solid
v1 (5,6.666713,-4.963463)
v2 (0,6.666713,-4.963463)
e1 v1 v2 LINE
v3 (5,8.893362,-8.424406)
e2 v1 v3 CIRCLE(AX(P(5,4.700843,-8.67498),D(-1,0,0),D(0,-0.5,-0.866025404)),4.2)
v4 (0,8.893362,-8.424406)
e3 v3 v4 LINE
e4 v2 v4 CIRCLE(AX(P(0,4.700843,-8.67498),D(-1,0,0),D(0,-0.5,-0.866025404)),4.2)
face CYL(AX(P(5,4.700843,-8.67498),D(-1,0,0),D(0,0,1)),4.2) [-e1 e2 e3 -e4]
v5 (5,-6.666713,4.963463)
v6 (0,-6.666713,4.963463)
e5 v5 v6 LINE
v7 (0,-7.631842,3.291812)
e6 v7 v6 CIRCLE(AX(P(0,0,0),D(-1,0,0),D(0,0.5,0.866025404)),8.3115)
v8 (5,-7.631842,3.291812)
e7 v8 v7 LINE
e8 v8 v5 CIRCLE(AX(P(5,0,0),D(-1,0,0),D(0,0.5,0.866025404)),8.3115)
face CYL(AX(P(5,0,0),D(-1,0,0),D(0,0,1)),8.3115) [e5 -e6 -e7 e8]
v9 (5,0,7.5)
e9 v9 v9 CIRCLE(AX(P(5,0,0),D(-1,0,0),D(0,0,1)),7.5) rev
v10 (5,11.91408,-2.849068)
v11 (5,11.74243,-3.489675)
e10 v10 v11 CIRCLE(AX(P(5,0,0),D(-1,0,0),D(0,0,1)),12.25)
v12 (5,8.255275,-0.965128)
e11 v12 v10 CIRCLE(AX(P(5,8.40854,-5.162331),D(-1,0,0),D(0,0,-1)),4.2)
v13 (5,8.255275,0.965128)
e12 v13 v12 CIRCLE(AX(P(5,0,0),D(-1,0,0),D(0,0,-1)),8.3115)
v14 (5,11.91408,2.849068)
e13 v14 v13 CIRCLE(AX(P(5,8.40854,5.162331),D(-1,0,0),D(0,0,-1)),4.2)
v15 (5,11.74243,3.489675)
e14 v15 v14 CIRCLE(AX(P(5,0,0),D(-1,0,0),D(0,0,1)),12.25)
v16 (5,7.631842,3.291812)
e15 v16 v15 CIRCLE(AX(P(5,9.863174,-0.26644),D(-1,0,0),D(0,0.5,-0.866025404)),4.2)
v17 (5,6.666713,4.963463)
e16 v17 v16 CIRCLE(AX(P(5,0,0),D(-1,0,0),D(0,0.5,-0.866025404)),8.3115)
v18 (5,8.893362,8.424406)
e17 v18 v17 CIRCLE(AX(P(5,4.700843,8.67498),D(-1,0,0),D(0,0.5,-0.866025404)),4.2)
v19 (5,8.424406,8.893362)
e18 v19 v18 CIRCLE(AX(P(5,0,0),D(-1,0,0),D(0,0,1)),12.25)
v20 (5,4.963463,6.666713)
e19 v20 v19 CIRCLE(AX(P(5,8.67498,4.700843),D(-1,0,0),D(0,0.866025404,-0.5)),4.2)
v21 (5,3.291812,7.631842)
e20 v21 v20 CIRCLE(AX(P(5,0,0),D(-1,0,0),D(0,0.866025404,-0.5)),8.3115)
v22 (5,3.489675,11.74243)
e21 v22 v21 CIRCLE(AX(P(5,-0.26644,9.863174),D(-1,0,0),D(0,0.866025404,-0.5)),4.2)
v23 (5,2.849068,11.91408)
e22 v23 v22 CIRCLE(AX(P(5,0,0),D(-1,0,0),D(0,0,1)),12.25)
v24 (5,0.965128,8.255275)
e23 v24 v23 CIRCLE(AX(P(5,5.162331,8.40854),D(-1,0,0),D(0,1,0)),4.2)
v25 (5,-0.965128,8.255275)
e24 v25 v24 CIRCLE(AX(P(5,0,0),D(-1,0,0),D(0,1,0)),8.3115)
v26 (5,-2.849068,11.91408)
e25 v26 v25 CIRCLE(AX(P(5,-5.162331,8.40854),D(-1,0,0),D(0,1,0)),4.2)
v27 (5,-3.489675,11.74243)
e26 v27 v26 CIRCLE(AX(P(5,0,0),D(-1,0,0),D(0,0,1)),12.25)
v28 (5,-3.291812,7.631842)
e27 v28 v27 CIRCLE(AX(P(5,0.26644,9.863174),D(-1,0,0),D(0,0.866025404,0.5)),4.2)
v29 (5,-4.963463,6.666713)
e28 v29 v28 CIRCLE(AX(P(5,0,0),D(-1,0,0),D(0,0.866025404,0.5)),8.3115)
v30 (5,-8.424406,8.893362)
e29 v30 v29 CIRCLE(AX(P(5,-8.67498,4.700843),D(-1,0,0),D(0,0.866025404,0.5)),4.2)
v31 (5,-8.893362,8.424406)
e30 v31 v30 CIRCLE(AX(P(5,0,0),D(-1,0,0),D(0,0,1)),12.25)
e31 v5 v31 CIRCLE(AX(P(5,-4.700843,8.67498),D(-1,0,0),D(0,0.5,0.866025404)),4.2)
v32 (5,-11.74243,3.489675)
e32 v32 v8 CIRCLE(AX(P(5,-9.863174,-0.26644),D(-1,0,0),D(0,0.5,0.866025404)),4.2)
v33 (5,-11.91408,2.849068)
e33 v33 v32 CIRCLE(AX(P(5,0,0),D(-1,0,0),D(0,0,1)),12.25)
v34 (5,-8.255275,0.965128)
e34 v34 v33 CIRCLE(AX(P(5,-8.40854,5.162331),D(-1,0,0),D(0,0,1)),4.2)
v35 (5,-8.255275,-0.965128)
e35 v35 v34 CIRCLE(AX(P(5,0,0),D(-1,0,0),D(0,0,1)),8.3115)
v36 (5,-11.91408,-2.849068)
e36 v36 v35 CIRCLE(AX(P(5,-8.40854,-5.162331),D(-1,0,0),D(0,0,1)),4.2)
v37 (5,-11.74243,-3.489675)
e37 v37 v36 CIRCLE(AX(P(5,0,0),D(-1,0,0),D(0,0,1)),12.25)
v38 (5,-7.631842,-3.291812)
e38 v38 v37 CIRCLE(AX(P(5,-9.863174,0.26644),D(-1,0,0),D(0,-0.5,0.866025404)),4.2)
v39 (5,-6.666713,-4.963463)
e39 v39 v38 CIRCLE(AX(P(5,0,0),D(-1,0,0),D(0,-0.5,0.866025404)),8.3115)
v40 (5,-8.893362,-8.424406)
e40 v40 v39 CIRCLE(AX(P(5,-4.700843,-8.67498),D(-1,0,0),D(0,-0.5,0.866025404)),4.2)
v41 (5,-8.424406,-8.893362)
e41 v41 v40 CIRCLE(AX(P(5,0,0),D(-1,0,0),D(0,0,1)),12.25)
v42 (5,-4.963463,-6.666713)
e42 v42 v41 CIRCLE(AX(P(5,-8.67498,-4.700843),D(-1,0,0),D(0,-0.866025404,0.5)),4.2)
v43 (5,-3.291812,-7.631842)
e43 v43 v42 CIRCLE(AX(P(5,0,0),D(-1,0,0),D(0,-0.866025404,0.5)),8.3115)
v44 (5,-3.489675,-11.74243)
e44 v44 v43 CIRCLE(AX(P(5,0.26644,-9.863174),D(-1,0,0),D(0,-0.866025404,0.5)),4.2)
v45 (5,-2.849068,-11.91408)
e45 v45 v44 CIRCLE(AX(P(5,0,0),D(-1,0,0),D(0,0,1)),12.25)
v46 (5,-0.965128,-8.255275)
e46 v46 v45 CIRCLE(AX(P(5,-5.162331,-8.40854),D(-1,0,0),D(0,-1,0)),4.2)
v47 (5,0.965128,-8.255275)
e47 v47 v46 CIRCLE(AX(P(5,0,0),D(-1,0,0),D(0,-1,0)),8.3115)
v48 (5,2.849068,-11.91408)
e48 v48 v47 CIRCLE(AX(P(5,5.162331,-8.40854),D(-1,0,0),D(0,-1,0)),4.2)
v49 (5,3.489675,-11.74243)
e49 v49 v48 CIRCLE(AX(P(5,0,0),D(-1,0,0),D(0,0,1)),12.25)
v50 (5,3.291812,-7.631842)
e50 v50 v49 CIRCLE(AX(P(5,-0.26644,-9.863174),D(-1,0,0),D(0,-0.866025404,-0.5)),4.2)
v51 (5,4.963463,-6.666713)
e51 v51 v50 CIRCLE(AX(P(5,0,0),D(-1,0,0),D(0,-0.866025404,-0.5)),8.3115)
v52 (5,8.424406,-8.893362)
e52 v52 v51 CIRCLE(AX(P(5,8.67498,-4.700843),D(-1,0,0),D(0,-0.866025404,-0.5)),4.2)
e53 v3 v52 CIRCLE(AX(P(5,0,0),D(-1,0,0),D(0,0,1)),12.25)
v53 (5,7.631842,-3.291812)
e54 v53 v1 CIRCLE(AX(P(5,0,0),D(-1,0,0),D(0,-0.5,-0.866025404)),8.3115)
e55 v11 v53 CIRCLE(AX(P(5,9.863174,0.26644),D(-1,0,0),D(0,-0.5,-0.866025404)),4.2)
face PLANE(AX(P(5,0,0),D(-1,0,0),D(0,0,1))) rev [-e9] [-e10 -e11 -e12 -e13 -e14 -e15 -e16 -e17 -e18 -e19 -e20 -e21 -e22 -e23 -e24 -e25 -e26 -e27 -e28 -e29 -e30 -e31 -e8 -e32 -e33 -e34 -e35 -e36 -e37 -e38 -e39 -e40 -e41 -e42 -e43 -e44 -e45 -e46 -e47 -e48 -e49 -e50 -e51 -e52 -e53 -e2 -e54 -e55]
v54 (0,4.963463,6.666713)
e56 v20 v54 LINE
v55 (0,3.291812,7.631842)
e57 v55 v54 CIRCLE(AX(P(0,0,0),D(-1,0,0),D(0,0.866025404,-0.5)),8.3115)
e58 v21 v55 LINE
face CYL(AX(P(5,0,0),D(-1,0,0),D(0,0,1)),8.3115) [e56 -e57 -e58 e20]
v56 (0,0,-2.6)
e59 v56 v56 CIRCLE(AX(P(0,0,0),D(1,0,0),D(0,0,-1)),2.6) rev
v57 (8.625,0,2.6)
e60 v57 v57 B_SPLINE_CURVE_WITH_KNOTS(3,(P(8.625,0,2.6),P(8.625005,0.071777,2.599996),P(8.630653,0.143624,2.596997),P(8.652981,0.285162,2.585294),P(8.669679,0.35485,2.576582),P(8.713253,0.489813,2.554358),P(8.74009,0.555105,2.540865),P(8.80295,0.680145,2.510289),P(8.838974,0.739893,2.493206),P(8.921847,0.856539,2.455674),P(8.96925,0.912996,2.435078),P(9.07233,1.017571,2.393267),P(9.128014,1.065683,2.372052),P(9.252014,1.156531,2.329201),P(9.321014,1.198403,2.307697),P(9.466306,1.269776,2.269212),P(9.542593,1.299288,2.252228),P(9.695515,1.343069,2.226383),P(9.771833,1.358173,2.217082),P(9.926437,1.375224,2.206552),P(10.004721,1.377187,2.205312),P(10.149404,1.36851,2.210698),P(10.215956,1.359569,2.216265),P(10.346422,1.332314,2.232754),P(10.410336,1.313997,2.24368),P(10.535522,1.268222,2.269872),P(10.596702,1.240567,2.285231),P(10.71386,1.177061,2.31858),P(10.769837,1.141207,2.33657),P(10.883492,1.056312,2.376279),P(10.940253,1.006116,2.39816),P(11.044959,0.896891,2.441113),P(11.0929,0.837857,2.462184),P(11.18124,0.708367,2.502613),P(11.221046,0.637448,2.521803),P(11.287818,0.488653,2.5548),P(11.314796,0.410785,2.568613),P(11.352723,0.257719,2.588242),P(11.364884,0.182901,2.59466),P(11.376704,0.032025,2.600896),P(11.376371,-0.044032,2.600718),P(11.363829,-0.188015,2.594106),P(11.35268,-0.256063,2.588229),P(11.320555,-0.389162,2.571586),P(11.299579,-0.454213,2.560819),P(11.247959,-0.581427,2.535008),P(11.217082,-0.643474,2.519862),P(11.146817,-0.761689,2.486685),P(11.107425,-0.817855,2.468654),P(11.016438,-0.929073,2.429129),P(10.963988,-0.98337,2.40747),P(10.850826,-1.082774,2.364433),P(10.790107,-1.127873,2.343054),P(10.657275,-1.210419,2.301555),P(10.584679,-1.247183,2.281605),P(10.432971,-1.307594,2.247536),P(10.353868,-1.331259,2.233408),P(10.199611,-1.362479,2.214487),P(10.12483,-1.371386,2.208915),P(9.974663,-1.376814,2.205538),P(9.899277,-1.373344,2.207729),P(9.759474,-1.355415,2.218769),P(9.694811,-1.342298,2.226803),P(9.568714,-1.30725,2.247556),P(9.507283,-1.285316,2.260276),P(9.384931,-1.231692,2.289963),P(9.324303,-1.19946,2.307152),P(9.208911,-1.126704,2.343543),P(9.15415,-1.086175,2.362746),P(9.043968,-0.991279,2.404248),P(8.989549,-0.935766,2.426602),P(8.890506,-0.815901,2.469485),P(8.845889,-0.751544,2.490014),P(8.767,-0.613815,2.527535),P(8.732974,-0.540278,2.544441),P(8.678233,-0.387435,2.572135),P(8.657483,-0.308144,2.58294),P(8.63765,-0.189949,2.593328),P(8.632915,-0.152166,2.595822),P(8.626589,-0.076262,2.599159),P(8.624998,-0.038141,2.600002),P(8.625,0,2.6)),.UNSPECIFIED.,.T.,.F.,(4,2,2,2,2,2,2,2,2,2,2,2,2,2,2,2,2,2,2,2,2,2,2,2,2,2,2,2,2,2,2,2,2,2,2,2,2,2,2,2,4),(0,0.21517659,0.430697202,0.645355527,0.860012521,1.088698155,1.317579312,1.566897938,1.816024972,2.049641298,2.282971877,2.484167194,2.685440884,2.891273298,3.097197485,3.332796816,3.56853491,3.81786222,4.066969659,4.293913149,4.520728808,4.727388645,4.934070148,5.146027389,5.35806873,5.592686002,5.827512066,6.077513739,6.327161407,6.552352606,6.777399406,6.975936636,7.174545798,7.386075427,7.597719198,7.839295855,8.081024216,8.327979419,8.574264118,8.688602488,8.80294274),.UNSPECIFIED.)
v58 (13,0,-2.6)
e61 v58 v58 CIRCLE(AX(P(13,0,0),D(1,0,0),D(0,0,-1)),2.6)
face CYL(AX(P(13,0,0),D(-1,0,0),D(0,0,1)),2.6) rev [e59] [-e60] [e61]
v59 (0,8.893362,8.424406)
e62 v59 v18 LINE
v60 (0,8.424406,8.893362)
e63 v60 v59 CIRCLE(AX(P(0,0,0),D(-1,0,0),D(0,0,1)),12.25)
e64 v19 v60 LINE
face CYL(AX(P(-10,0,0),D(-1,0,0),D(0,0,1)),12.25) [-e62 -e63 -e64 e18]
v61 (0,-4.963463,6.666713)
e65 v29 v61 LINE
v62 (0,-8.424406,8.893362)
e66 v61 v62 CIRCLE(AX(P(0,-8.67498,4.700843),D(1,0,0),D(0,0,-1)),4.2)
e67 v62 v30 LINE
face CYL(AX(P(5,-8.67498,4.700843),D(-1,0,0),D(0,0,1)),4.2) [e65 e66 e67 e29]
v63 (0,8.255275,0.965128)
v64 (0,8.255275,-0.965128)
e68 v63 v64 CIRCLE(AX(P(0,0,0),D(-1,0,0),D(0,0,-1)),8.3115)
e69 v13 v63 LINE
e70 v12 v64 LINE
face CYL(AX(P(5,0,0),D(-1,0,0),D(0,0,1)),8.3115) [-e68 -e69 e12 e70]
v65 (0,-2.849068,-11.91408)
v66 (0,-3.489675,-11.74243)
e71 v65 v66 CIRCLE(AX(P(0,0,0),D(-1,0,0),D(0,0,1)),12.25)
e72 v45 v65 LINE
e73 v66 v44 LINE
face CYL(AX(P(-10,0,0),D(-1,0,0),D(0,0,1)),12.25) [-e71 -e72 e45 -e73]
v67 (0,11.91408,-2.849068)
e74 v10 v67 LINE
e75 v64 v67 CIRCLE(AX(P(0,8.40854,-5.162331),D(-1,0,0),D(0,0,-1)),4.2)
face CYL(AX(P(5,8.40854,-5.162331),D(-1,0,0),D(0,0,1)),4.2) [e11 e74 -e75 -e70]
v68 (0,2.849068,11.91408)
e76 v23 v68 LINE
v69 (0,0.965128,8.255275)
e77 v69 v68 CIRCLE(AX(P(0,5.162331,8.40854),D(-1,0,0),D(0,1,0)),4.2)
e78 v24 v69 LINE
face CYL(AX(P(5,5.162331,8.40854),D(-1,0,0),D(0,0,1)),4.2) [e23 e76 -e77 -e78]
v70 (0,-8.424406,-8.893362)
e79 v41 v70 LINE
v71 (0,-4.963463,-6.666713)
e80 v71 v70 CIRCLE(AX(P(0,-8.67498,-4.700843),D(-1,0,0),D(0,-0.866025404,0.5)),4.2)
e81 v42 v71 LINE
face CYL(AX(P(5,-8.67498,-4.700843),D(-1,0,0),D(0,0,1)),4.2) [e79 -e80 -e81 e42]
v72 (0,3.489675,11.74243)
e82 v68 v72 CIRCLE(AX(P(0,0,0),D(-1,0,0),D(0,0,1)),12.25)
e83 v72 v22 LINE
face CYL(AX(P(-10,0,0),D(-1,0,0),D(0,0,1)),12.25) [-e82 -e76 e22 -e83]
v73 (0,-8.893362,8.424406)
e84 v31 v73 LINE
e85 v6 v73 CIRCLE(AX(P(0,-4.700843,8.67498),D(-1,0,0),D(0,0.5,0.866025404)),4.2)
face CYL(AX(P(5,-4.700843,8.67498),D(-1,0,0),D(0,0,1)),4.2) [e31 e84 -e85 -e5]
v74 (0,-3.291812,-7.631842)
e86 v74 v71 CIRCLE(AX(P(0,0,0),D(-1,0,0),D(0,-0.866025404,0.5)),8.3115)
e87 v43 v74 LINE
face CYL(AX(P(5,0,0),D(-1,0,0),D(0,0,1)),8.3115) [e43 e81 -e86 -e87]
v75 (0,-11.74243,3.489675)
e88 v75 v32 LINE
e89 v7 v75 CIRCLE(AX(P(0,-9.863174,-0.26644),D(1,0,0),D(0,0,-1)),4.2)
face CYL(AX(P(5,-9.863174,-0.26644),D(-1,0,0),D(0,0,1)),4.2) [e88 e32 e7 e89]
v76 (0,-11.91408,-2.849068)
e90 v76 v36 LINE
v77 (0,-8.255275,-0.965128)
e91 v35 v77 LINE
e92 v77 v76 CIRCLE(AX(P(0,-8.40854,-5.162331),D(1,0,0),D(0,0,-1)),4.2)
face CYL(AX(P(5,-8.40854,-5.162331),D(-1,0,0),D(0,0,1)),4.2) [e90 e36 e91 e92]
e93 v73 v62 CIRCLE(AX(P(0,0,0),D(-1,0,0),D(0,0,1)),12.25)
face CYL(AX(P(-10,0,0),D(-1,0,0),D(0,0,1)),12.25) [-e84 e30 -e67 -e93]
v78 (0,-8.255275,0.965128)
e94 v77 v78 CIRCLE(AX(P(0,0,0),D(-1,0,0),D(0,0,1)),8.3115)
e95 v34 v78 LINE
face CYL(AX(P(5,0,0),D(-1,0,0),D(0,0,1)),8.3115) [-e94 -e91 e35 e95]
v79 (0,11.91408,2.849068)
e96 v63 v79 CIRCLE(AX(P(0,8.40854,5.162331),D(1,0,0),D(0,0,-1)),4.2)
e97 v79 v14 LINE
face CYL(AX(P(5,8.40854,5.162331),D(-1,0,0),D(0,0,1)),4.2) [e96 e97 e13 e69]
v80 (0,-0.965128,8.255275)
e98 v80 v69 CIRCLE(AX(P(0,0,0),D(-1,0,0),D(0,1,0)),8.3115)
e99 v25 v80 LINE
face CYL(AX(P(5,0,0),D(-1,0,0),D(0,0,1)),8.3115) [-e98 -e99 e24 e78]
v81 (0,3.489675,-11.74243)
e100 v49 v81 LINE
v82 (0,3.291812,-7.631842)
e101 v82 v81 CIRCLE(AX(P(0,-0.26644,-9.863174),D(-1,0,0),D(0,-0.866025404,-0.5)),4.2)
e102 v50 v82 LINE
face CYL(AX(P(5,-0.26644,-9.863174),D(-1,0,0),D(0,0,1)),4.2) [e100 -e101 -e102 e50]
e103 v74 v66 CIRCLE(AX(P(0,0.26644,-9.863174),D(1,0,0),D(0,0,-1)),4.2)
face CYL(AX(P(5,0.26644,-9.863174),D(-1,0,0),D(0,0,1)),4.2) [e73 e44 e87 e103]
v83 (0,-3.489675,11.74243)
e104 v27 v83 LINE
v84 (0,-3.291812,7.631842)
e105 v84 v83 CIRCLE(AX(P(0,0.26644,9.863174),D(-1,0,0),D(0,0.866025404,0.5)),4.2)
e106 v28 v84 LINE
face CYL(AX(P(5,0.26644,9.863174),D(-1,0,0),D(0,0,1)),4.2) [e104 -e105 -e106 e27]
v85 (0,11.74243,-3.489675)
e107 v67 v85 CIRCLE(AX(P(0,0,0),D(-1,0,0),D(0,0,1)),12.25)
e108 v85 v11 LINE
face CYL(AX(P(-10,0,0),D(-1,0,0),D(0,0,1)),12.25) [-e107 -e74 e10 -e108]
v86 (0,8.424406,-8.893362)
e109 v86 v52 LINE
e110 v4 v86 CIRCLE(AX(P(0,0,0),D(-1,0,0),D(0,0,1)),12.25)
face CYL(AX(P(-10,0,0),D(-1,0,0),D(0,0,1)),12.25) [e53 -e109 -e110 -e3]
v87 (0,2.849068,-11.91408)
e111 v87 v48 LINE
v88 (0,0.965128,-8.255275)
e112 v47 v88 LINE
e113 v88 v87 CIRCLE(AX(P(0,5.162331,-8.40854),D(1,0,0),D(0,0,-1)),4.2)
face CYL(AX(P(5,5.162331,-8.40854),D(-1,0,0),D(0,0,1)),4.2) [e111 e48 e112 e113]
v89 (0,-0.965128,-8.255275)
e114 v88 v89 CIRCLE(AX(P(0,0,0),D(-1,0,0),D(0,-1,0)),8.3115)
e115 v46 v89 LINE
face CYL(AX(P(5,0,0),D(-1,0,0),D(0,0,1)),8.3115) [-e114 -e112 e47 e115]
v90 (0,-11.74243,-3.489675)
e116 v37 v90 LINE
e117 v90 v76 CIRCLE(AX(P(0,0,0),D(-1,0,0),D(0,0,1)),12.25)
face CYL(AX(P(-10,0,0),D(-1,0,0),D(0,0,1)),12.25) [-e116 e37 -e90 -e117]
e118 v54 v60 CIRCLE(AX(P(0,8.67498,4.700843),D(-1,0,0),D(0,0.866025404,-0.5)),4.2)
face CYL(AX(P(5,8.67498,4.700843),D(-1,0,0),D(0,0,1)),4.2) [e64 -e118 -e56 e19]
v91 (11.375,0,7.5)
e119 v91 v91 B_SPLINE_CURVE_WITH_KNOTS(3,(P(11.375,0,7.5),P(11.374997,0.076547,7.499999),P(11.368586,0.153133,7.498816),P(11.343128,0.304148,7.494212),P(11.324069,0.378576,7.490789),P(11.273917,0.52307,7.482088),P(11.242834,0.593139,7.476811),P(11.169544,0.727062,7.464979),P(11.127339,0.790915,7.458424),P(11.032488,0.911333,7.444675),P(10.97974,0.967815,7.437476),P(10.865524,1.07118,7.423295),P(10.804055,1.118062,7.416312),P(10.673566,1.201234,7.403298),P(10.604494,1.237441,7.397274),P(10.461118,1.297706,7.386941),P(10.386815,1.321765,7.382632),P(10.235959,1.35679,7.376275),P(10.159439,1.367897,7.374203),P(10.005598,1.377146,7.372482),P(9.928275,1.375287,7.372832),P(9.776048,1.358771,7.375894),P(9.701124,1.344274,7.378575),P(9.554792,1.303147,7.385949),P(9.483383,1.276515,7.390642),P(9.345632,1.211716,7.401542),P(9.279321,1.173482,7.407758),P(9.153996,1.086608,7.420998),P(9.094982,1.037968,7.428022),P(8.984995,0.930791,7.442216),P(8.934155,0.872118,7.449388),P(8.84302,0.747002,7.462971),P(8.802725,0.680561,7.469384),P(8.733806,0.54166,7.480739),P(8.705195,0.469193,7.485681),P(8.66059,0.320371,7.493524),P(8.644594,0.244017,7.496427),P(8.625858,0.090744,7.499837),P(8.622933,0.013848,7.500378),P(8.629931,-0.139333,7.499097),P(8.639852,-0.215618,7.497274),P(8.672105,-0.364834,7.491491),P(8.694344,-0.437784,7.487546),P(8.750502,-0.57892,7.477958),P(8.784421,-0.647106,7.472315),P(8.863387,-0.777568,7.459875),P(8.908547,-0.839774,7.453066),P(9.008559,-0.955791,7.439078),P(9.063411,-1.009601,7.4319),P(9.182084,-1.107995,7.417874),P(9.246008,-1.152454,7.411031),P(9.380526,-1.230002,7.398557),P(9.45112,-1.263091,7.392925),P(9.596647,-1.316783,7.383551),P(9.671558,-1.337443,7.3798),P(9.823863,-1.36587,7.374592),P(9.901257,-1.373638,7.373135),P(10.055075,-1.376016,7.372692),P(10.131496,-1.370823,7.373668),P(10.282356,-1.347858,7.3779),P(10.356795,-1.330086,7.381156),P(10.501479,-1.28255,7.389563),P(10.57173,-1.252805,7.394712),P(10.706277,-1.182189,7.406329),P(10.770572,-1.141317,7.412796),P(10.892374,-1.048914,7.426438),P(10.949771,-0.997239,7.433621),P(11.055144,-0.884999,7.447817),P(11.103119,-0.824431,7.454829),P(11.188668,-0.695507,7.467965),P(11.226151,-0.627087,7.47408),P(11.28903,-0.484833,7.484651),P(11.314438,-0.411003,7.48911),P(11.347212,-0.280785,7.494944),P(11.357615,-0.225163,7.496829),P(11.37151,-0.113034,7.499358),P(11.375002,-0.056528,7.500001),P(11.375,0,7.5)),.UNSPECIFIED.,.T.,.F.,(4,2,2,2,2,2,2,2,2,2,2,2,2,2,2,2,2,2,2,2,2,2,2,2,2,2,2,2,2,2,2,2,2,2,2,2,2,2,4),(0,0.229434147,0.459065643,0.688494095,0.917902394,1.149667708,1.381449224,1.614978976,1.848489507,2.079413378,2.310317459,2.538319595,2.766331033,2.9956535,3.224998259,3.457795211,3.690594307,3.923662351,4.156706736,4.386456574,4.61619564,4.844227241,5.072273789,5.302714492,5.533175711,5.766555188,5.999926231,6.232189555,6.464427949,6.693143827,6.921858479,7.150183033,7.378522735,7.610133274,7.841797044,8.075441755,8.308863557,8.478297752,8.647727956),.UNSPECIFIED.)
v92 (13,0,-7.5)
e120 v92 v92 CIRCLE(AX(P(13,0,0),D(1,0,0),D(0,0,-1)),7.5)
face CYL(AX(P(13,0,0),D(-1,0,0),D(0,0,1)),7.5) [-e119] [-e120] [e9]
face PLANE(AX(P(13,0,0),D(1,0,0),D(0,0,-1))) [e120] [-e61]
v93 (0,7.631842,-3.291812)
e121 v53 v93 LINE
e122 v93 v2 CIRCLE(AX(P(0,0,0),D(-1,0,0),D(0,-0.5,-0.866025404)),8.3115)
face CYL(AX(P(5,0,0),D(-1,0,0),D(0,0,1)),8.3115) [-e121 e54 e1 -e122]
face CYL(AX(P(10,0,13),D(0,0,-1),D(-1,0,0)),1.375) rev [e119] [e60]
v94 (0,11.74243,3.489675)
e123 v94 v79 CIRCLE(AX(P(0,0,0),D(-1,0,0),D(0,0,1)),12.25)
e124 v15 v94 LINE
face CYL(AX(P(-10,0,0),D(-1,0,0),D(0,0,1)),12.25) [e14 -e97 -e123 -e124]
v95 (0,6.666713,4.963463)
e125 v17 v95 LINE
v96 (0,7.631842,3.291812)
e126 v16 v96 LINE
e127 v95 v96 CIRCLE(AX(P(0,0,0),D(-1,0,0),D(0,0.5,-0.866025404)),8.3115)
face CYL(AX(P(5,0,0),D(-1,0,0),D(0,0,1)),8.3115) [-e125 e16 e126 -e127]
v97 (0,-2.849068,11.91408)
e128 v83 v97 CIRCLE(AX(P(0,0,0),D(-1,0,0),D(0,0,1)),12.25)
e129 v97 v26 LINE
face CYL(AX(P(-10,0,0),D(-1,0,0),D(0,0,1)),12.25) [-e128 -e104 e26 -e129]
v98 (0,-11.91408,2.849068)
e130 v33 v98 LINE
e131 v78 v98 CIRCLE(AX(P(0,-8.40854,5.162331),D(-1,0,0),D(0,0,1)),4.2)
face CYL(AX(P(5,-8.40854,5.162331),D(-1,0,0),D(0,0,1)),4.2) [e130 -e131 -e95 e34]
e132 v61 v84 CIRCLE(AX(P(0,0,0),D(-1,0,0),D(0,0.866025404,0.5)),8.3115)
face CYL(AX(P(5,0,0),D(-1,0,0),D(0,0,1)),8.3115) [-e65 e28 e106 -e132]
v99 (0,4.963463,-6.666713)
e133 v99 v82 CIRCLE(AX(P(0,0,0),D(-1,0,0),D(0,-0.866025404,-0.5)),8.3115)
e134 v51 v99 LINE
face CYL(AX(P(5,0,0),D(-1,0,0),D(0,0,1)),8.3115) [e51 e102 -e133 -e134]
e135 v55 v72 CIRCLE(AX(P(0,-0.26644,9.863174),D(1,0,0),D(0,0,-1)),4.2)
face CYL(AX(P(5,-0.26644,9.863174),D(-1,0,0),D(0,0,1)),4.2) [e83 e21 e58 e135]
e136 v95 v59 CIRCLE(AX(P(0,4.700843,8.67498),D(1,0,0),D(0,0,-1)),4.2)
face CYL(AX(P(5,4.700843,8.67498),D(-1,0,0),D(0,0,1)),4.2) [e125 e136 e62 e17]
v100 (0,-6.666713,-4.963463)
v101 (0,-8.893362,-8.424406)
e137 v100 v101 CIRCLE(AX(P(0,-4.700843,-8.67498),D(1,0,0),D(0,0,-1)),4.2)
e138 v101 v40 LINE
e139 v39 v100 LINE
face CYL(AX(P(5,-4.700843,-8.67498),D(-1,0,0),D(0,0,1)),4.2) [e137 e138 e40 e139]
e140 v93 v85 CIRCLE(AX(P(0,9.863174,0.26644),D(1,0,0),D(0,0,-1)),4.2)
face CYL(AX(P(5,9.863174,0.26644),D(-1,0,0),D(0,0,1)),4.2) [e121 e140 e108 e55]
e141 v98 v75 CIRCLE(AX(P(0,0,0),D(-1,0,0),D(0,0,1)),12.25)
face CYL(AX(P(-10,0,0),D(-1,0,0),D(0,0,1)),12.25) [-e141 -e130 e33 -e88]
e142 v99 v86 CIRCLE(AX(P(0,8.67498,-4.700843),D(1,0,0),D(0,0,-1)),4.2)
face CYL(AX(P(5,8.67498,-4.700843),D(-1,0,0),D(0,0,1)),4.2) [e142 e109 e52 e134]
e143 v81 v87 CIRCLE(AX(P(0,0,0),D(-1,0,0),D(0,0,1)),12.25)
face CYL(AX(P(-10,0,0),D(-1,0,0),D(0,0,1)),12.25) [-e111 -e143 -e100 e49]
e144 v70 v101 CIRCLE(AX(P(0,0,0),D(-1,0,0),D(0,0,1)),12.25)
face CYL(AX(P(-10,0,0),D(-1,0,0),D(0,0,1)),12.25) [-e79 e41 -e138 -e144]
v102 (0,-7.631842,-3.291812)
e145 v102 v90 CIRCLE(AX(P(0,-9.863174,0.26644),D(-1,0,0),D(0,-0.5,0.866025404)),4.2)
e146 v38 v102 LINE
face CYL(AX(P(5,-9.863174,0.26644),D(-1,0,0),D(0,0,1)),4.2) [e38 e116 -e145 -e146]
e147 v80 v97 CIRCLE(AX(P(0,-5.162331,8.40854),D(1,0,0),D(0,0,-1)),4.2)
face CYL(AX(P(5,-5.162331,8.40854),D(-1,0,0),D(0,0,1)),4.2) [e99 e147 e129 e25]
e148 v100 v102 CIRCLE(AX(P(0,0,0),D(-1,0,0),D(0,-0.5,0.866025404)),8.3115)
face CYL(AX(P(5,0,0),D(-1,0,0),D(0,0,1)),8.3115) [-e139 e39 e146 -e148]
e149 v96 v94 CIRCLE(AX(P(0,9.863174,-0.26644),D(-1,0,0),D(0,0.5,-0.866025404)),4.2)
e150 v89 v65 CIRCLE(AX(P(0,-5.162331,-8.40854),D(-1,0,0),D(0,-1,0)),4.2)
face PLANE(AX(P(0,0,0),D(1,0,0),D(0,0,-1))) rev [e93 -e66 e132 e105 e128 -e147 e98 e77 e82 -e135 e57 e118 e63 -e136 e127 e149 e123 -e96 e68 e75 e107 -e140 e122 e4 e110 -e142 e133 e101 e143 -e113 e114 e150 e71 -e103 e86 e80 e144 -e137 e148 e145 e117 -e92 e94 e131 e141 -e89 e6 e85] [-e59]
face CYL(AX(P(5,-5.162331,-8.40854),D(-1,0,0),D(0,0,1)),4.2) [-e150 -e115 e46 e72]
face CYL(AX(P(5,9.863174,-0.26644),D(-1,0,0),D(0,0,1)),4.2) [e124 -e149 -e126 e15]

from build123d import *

# Parameters (mm, degrees)
METRIC_SPUR_GEAR_1_75M_12T_20PA_5FW_OU_R  = 2.5
METRIC_SPUR_GEAR_1_75M_12T_20PA_5FW_DEPTH = 5
SKETCH2_R                                 = 7.5
SKETCH2_R_2                               = 2.5
BOSS_EXTRUDE1_DEPTH                       = 13
SKETCH3_R                                 = 1.375
CUT_EXTRUDE1_DEPTH                        = 13
CUT_EXTRUDE2_DEPTH                        = 22.281227002
CUT_EXTRUDE2_DEPTH_BACK                   = 22.281227002
SKETCH4_R                                 = 2.6


# Read off the part's stored shape, not the designer's step: Metric - Spur gear 1.75M 12T 20PA 5FW ---S12N75H50L5N
with BuildPart() as part:
    # Metric - Spur gear 1.75M 12T 20PA 5FW ou → Metric - Spur gear 1.75M 12T 20PA 5FW (new body)
    with BuildSketch(Plane.YZ):
        with BuildLine():
            ThreePointArc((8.893362097, 8.424405653), (8.66205807, 8.66205807), (8.424405653, 8.893362097))
            ThreePointArc((8.424405653, 8.893362097), (6.40252905, 8.232977147), (4.963463004, 6.666713378))
            ThreePointArc((4.963463004, 6.666713378), (4.15575, 7.197970144), (3.291811643, 7.631841741))
            ThreePointArc((3.291811643, 7.631841741), (3.928702834, 9.661241379), (3.489674675, 11.742430356))
            ThreePointArc((3.489674675, 11.742430356), (3.170533302, 11.832591372), (2.849068258, 11.914080328))
            ThreePointArc((2.849068258, 11.914080328), (1.428264232, 10.331231883), (0.965128363, 8.255274647))
            ThreePointArc((0.965128363, 8.255274647), (0, 8.3115), (-0.965128363, 8.255274647))
            ThreePointArc((-0.965128363, 8.255274647), (-1.428264232, 10.331231883), (-2.849068258, 11.914080328))
            ThreePointArc((-2.849068258, 11.914080328), (-3.170533302, 11.832591372), (-3.489674675, 11.742430356))
            ThreePointArc((-3.489674675, 11.742430356), (-3.928702834, 9.661241379), (-3.291811643, 7.631841741))
            ThreePointArc((-3.291811643, 7.631841741), (-4.15575, 7.197970144), (-4.963463004, 6.666713378))
            ThreePointArc((-4.963463004, 6.666713378), (-6.40252905, 8.232977147), (-8.424405653, 8.893362097))
            ThreePointArc((-8.424405653, 8.893362097), (-8.66205807, 8.66205807), (-8.893362097, 8.424405653))
            ThreePointArc((-8.893362097, 8.424405653), (-8.232977147, 6.40252905), (-6.666713378, 4.963463004))
            ThreePointArc((-6.666713378, 4.963463004), (-7.197970144, 4.15575), (-7.631841741, 3.291811643))
            ThreePointArc((-7.631841741, 3.291811643), (-9.661241379, 3.928702834), (-11.742430356, 3.489674675))
            ThreePointArc((-11.742430356, 3.489674675), (-11.832591372, 3.170533302), (-11.914080328, 2.849068258))
            ThreePointArc((-11.914080328, 2.849068258), (-10.331231883, 1.428264232), (-8.255274647, 0.965128363))
            ThreePointArc((-8.255274647, 0.965128363), (-8.3115, 0), (-8.255274647, -0.965128363))
            ThreePointArc((-8.255274647, -0.965128363), (-10.331231883, -1.428264232), (-11.914080328, -2.849068258))
            ThreePointArc((-11.914080328, -2.849068258), (-11.832591372, -3.170533302), (-11.742430356, -3.489674675))
            ThreePointArc((-11.742430356, -3.489674675), (-9.661241379, -3.928702834), (-7.631841741, -3.291811643))
            ThreePointArc((-7.631841741, -3.291811643), (-7.197970144, -4.15575), (-6.666713378, -4.963463004))
            ThreePointArc((-6.666713378, -4.963463004), (-8.232977147, -6.40252905), (-8.893362097, -8.424405653))
            ThreePointArc((-8.893362097, -8.424405653), (-8.66205807, -8.66205807), (-8.424405653, -8.893362097))
            ThreePointArc((-8.424405653, -8.893362097), (-6.40252905, -8.232977147), (-4.963463004, -6.666713378))
            ThreePointArc((-4.963463004, -6.666713378), (-4.15575, -7.197970144), (-3.291811643, -7.631841741))
            ThreePointArc((-3.291811643, -7.631841741), (-3.928702834, -9.661241379), (-3.489674675, -11.742430356))
            ThreePointArc((-3.489674675, -11.742430356), (-3.170533302, -11.832591372), (-2.849068258, -11.914080328))
            ThreePointArc((-2.849068258, -11.914080328), (-1.428264232, -10.331231883), (-0.965128363, -8.255274647))
            ThreePointArc((-0.965128363, -8.255274647), (0, -8.3115), (0.965128363, -8.255274647))
            ThreePointArc((0.965128363, -8.255274647), (1.428264232, -10.331231883), (2.849068258, -11.914080328))
            ThreePointArc((2.849068258, -11.914080328), (3.170533302, -11.832591372), (3.489674675, -11.742430356))
            ThreePointArc((3.489674675, -11.742430356), (3.928702834, -9.661241379), (3.291811643, -7.631841741))
            ThreePointArc((3.291811643, -7.631841741), (4.15575, -7.197970144), (4.963463004, -6.666713378))
            ThreePointArc((4.963463004, -6.666713378), (6.40252905, -8.232977147), (8.424405653, -8.893362097))
            ThreePointArc((8.424405653, -8.893362097), (8.66205807, -8.66205807), (8.893362097, -8.424405653))
            ThreePointArc((8.893362097, -8.424405653), (8.232977147, -6.40252905), (6.666713378, -4.963463004))
            ThreePointArc((6.666713378, -4.963463004), (7.197970144, -4.15575), (7.631841741, -3.291811643))
            ThreePointArc((7.631841741, -3.291811643), (9.661241379, -3.928702834), (11.742430356, -3.489674675))
            ThreePointArc((11.742430356, -3.489674675), (11.832591372, -3.170533302), (11.914080328, -2.849068258))
            ThreePointArc((11.914080328, -2.849068258), (10.331231883, -1.428264232), (8.255274647, -0.965128363))
            ThreePointArc((8.255274647, -0.965128363), (8.3115, 0), (8.255274647, 0.965128363))
            ThreePointArc((8.255274647, 0.965128363), (10.331231883, 1.428264232), (11.914080328, 2.849068258))
            ThreePointArc((11.914080328, 2.849068258), (11.832591372, 3.170533302), (11.742430356, 3.489674675))
            ThreePointArc((11.742430356, 3.489674675), (9.661241379, 3.928702834), (7.631841741, 3.291811643))
            ThreePointArc((7.631841741, 3.291811643), (7.197970144, 4.15575), (6.666713378, 4.963463004))
            ThreePointArc((6.666713378, 4.963463004), (8.232977147, 6.40252905), (8.893362097, 8.424405653))
        make_face()
        Circle(METRIC_SPUR_GEAR_1_75M_12T_20PA_5FW_OU_R, mode=Mode.SUBTRACT)
    extrude(amount=METRIC_SPUR_GEAR_1_75M_12T_20PA_5FW_DEPTH)

    # Sketch2 → Boss-Extrude1 (add)
    with BuildSketch(Plane(origin=(0, 0, 0), x_dir=(0, 0, -1), z_dir=(1, 0, 0))):
        with Locations(Location((0, 0, 0), (0, 0, 180))):
            Circle(SKETCH2_R)
        Circle(SKETCH2_R_2, mode=Mode.SUBTRACT)
    extrude(amount=BOSS_EXTRUDE1_DEPTH)

    # Sketch3 → Cut-Extrude1 (cut)
    with BuildSketch(Plane.XY):
        with Locations((10, 0)):
            Circle(SKETCH3_R)
    extrude(amount=CUT_EXTRUDE1_DEPTH, mode=Mode.SUBTRACT)

    # Sketch4 → Cut-Extrude2 (cut, two sides: drawn at the far end of the back side and taken through both)
    with BuildSketch(Plane(origin=(0, 0, 0), x_dir=(0, 0, -1), z_dir=(1, 0, 0)).offset(-CUT_EXTRUDE2_DEPTH_BACK)):
        Circle(SKETCH4_R)
    extrude(amount=CUT_EXTRUDE2_DEPTH + CUT_EXTRUDE2_DEPTH_BACK, mode=Mode.SUBTRACT)


solid = part.part
